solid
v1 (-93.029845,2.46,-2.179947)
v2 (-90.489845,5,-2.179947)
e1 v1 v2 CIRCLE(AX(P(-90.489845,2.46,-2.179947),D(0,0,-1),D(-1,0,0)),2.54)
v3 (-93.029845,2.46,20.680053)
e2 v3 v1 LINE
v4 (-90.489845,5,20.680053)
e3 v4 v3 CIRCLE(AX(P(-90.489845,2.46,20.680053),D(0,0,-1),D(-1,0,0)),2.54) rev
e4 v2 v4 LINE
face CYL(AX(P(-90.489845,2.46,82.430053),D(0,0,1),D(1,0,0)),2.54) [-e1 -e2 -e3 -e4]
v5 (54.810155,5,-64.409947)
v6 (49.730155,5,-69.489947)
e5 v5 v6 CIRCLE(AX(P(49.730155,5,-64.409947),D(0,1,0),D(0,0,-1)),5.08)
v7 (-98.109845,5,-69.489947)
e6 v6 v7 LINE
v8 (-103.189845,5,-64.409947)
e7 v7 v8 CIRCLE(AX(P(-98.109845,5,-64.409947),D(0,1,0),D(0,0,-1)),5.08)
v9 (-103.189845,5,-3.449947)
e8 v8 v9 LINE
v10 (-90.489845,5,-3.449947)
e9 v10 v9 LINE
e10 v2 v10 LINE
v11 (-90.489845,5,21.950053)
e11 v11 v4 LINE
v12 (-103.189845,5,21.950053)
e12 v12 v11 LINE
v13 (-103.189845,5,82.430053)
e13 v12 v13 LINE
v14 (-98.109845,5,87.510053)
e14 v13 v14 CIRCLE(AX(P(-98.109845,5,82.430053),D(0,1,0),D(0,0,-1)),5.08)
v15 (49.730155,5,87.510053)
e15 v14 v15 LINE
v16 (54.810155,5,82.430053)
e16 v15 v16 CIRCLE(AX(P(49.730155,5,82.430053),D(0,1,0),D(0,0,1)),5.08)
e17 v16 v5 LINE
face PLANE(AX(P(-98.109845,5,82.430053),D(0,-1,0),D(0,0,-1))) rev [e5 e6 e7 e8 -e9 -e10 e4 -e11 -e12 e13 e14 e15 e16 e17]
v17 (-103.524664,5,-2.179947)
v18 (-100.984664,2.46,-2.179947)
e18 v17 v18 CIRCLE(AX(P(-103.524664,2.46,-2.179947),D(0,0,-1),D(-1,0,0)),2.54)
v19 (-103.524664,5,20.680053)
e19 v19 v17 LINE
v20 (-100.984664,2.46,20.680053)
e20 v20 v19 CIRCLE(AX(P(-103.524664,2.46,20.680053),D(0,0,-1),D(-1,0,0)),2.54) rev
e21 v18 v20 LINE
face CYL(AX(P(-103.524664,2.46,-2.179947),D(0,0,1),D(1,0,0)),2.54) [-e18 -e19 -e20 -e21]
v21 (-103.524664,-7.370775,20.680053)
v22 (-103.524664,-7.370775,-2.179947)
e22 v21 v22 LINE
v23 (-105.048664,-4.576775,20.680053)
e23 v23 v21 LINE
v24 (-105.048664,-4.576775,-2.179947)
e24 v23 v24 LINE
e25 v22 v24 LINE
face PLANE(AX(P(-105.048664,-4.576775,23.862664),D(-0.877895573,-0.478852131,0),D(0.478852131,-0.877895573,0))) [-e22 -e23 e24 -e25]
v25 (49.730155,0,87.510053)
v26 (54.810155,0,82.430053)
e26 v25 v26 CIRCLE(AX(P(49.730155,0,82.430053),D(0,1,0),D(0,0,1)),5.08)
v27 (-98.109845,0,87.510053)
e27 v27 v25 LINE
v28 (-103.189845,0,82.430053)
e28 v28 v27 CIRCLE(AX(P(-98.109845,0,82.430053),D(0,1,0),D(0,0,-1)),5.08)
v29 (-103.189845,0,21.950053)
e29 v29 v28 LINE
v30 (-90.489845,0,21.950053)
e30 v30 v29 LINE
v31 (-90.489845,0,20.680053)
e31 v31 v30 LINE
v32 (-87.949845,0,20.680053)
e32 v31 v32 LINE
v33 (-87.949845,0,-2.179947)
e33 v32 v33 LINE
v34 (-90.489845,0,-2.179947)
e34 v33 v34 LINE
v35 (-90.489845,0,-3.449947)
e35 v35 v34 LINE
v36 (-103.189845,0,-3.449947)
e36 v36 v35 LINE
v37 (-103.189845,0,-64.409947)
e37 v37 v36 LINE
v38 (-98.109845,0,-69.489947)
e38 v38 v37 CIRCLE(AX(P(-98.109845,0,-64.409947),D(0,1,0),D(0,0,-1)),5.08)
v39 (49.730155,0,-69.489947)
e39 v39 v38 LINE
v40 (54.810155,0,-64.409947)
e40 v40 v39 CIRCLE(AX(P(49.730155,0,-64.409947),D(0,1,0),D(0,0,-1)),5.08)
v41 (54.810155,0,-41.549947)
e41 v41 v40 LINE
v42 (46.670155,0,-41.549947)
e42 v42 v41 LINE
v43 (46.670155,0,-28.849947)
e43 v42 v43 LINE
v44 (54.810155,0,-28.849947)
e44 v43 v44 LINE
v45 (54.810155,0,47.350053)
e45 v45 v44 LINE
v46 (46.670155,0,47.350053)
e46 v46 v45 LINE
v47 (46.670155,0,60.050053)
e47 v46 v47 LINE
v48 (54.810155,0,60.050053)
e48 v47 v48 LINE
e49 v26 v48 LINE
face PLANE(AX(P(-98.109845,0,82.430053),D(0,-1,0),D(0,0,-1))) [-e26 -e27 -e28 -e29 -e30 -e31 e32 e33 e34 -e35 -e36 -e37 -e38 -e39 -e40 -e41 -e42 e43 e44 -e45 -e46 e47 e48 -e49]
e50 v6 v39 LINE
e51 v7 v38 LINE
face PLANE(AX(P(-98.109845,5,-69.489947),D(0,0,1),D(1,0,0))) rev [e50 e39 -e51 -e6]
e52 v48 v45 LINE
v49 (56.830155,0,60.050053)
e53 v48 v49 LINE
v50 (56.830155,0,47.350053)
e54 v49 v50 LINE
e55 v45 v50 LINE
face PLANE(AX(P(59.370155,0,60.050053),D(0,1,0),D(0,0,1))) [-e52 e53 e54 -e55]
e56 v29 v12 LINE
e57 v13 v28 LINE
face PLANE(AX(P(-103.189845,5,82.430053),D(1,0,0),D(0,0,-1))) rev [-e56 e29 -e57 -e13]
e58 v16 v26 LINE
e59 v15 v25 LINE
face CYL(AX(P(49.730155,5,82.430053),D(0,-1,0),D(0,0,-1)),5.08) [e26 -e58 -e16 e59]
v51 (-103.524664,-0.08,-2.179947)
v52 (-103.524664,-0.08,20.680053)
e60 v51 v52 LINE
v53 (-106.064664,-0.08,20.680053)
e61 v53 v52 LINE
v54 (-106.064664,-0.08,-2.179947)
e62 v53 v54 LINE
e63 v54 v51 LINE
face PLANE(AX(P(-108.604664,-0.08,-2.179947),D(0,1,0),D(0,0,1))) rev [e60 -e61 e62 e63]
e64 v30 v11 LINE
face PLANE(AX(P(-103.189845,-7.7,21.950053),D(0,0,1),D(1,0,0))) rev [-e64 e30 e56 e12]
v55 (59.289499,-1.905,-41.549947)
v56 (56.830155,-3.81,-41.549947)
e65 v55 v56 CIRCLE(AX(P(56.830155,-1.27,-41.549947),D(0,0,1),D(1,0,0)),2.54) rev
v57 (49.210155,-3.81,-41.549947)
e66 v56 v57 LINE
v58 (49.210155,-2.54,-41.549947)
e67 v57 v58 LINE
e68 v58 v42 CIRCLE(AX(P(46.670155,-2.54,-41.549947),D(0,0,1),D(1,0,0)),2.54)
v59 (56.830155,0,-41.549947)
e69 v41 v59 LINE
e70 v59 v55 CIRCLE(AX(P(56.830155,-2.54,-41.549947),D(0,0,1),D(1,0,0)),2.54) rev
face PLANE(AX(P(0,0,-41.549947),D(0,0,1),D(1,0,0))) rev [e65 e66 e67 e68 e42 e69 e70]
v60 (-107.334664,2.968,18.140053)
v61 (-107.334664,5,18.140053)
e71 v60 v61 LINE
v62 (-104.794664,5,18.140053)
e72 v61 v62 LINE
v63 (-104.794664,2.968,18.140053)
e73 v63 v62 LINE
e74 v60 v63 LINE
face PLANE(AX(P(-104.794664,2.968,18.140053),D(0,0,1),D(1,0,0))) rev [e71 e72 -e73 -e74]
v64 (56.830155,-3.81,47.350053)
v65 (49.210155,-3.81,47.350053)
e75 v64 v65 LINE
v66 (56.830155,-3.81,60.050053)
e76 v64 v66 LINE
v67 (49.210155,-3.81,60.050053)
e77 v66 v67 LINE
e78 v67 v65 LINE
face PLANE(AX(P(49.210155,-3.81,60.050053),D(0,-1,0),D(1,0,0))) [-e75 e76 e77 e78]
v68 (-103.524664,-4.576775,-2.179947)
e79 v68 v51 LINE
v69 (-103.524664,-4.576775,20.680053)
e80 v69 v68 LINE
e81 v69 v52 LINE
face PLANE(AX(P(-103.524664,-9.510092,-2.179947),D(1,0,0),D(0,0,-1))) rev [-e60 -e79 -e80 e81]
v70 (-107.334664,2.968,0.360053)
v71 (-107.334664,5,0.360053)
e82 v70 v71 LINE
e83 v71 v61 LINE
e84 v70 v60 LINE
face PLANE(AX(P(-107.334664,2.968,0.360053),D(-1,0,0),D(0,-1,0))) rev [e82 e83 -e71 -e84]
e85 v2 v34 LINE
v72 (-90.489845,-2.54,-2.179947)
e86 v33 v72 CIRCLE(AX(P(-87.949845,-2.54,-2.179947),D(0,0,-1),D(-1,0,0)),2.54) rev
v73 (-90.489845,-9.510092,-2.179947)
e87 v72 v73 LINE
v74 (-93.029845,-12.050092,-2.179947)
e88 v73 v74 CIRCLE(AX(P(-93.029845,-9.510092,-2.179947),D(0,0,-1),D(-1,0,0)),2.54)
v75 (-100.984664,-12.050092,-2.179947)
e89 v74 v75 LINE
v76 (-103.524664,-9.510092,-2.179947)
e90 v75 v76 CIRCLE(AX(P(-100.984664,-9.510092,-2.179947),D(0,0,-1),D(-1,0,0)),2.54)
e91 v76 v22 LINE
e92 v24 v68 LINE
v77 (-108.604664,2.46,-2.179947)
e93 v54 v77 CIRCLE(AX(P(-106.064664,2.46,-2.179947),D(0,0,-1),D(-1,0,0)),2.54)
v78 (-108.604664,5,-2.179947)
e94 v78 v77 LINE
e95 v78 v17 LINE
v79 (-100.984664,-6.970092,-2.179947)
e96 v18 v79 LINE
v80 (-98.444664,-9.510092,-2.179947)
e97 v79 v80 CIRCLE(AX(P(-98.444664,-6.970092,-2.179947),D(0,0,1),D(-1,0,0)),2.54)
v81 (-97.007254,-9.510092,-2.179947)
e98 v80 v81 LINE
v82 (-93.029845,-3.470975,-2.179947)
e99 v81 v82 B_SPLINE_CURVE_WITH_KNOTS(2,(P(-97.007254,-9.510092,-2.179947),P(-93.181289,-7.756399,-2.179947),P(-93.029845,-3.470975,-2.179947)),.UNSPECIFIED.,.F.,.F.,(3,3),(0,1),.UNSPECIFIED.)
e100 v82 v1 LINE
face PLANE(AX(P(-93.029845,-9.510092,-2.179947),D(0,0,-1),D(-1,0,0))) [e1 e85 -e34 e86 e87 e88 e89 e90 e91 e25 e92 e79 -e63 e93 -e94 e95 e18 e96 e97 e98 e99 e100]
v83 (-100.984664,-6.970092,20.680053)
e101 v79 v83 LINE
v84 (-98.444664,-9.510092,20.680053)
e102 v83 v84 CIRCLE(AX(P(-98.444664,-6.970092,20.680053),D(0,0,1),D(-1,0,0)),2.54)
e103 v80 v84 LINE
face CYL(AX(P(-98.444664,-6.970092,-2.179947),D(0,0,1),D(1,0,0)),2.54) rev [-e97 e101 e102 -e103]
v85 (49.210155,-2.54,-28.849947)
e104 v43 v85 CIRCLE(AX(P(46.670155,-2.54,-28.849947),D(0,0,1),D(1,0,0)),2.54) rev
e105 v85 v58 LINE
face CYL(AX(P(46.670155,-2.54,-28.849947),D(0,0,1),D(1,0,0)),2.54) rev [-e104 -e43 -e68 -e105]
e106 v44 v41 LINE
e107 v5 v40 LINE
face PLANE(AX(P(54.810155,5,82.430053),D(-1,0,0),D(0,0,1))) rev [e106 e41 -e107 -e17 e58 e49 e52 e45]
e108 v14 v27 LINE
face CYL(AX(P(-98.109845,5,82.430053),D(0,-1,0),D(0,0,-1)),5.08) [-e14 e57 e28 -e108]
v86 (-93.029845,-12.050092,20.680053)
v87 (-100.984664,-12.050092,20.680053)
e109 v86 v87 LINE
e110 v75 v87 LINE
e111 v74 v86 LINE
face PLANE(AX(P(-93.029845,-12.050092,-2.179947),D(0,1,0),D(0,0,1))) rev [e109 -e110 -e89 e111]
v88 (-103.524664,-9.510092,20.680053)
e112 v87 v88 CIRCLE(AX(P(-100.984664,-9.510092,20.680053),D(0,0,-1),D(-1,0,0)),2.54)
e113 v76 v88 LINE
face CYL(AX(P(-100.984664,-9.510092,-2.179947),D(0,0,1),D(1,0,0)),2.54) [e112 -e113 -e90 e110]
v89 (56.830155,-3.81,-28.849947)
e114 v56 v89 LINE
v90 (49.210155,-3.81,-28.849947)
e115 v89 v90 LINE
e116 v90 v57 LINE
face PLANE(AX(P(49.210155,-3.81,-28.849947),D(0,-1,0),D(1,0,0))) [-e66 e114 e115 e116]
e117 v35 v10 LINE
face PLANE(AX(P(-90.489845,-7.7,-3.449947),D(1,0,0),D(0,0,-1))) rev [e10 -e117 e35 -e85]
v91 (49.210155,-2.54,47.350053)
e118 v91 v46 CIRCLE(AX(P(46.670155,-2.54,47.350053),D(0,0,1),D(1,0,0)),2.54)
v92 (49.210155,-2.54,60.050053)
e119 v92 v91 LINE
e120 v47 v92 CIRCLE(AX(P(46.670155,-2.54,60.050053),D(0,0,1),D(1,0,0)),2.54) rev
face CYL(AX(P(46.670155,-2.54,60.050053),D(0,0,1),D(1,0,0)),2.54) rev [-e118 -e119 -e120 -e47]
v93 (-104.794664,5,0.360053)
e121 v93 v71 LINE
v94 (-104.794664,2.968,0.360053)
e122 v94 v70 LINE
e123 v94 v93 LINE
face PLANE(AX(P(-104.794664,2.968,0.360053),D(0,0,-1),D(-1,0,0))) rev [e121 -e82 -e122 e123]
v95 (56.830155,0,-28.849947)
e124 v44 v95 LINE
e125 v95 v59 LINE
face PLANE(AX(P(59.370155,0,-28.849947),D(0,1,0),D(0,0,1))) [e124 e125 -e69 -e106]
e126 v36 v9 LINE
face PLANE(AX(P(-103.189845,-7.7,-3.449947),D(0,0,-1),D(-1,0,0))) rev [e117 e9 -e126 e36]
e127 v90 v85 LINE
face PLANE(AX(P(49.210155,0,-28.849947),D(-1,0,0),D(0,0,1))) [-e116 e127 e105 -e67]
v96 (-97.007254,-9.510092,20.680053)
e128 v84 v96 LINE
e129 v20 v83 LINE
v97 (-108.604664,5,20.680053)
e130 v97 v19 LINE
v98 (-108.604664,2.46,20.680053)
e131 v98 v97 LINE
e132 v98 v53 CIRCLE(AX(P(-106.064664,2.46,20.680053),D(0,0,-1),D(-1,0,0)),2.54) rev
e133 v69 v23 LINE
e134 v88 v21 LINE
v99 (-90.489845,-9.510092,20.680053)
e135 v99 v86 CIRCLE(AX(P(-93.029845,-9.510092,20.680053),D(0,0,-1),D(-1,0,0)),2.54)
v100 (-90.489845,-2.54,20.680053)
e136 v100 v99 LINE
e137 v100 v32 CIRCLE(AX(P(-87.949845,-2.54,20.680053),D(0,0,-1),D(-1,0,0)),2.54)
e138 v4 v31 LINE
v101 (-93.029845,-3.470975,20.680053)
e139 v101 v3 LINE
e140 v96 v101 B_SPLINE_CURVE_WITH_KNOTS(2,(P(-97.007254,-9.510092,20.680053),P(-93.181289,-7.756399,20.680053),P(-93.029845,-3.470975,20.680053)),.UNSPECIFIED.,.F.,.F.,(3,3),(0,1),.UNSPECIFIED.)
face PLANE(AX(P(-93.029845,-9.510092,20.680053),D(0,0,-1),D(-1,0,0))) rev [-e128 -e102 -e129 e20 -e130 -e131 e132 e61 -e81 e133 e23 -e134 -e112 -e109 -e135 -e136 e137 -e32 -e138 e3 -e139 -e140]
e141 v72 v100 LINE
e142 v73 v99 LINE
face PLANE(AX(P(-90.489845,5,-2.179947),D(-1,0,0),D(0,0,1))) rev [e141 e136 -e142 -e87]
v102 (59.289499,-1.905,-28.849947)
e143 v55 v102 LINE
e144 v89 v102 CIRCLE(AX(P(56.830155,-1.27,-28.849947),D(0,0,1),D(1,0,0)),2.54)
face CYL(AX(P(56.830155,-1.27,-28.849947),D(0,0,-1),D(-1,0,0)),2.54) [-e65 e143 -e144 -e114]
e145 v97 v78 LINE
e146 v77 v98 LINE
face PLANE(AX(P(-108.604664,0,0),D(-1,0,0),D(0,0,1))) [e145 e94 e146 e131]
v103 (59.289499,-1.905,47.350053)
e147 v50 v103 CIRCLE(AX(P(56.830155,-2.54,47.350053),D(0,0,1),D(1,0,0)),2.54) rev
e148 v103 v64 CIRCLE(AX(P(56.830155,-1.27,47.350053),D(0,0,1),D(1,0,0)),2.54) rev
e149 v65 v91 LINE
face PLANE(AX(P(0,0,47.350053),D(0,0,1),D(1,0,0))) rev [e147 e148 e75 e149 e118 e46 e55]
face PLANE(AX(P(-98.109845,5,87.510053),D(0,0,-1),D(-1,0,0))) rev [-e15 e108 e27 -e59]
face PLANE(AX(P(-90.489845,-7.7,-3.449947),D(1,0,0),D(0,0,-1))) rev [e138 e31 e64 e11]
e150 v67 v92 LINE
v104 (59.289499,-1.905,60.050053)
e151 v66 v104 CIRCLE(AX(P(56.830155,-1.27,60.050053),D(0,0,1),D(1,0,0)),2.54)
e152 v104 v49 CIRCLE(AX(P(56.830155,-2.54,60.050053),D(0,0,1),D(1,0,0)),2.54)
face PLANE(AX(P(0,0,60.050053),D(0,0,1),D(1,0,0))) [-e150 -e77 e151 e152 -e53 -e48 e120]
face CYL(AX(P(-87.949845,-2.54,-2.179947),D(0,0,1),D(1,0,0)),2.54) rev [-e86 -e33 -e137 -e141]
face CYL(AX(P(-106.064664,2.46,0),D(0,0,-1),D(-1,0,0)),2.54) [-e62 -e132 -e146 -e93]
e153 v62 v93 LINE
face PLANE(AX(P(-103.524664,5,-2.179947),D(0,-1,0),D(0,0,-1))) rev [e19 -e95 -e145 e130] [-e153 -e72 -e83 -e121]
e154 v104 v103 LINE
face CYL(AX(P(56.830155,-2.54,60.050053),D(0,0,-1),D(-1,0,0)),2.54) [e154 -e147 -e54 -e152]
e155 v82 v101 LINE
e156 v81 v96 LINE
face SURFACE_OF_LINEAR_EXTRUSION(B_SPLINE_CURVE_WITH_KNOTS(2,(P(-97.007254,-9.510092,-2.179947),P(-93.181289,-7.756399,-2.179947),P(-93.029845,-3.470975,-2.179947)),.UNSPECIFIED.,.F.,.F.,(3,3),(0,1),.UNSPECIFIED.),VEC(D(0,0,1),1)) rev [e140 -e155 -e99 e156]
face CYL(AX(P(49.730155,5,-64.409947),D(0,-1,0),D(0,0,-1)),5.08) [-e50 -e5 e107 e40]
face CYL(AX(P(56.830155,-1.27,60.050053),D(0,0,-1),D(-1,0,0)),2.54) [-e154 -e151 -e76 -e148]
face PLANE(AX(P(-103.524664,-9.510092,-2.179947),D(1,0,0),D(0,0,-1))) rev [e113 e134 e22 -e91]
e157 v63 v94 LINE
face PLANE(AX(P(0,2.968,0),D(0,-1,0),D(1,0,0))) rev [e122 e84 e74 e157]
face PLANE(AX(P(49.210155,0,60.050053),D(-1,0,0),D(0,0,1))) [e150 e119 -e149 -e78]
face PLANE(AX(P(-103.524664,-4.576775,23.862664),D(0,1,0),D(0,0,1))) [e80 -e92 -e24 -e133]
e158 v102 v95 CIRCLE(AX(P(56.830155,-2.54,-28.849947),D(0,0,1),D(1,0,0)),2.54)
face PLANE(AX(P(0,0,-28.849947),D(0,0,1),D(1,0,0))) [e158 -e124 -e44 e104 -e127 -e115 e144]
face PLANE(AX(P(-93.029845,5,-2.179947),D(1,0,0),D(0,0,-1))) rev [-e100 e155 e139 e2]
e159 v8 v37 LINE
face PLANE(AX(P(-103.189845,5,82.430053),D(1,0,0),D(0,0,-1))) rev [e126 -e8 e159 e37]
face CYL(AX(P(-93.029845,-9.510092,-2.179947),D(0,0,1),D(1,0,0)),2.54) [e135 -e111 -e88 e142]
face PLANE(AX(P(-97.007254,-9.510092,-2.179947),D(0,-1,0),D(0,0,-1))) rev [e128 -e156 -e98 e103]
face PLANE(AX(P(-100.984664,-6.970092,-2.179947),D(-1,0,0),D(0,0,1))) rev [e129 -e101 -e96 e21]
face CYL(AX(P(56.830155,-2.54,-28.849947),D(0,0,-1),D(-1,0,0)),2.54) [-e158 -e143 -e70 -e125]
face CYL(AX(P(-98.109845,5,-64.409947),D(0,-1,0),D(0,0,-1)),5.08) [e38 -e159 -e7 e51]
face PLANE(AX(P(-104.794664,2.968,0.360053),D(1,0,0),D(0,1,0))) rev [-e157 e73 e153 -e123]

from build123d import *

# Parameters (mm, degrees)
BOSS_EXTRUDE1_DEPTH  = 5
SKETCH8_W            = 12.7
SKETCH8_H            = 25.4
CUT_EXTRUDE1_DEPTH   = 12.7
BOSS_EXTRUDE6_START  = 1.27
BOSS_EXTRUDE6_DEPTH  = 22.86
FILLET3_R            = 2.54
SKETCH12_W           = 22.86
SKETCH12_H           = 5.08
BOSS_EXTRUDE7_DEPTH  = 5.08
FILLET8_R            = 2.54
SKETCH13_W           = 2.54
SKETCH13_H           = 17.78
CUT_EXTRUDE2_DEPTH   = 2.032
BOSS_EXTRUDE8_DEPTH  = 22.86
FILLET5_R            = 2.54
FILLET6_R            = 2.54
BOSS_EXTRUDE9_START  = -27.94
SKETCH15_W           = 10.16
SKETCH15_H           = 3.81
BOSS_EXTRUDE9_DEPTH  = 12.7
BOSS_EXTRUDE10_START = -116.84
SKETCH15_2_W         = 10.16
SKETCH15_2_H         = 3.81
BOSS_EXTRUDE10_DEPTH = 12.7
FILLET7_R            = 2.54


with BuildPart() as part:
    # Sketch2 → Boss-Extrude1 (new body)
    with BuildSketch(Plane(origin=(0, 0, 0), x_dir=(1, 0, 0), z_dir=(0, 1, 0))):
        with BuildLine():
            Line((-98.109845206, -87.510053172), (49.730154794, -87.510053172))
            ThreePointArc((49.730154794, -87.510053172), (53.322257243, -86.02215562), (54.810154794, -82.430053172))
            Line((54.810154794, -82.430053172), (54.810154794, 64.409946828))
            ThreePointArc((54.810154794, 64.409946828), (53.322257243, 68.002049277), (49.730154794, 69.489946828))
            Line((49.730154794, 69.489946828), (-98.109845206, 69.489946828))
            ThreePointArc((-98.109845206, 69.489946828), (-101.701947654, 68.002049277), (-103.189845206, 64.409946828))
            Line((-103.189845206, 64.409946828), (-103.189845206, -82.430053172))
            ThreePointArc((-103.189845206, -82.430053172), (-101.701947654, -86.02215562), (-98.109845206, -87.510053172))
        make_face()
    extrude(amount=BOSS_EXTRUDE1_DEPTH)

    # Sketch8 → Cut-Extrude1 (cut)
    with BuildSketch(Plane(origin=(0, 5, 0), x_dir=(1, 0, 0), z_dir=(0, 1, 0))):
        with Locations((-96.839845206, -9.250053172)):
            Rectangle(SKETCH8_W, SKETCH8_H)
    extrude(amount=-CUT_EXTRUDE1_DEPTH, mode=Mode.SUBTRACT)

    # Sketch9 → Boss-Extrude6 (add)
    with BuildSketch(Plane(origin=(0, 0, 21.950053172), x_dir=(-1, 0, 0), z_dir=(0, 0, -1)).offset(BOSS_EXTRUDE6_START)):
        with BuildLine():
            Line((90.489845206, 5), (90.489845206, -9.510091846))
            ThreePointArc((90.489845206, -9.510091846), (91.233793982, -11.30614307), (93.029845206, -12.050091846))
            Line((93.029845206, -12.050091846), (100.984663509, -12.050091846))
            ThreePointArc((100.984663509, -12.050091846), (102.780714734, -11.30614307), (103.524663509, -9.510091846))
            Line((103.524663509, -9.510091846), (103.524663509, 5))
            Line((103.524663509, 5), (100.984663509, 5))
            Line((100.984663509, 5), (100.984663509, -6.970091846))
            ThreePointArc((100.984663509, -6.970091846), (100.240714734, -8.76614307), (98.444663509, -9.510091846))
            Line((98.444663509, -9.510091846), (97.007254358, -9.510091846))
            add(Edge.make_bspline(
                [(93.029845206, -3.470974905), (93.181288834, -7.756398779), (97.007254358, -9.510091846)],
                knots=[0, 0, 0, 1, 1, 1], degree=2))
            Line((93.029845206, -3.470974905), (93.029845206, 5))
            Line((93.029845206, 5), (90.489845206, 5))
        make_face()
    extrude(amount=BOSS_EXTRUDE6_DEPTH)

    # Fillet3
    fillet3_edges = [part.edges().sort_by_distance(p)[0] for p in [
        (-90.489845206, 0, 9.250053172),
    ]]
    fillet(fillet3_edges, radius=FILLET3_R)

    # Sketch12 → Boss-Extrude7 (add)
    with BuildSketch(Plane.ZY.offset(103.524663509)):
        with Locations((9.250053172, 2.46)):
            Rectangle(SKETCH12_W, SKETCH12_H)
    extrude(amount=BOSS_EXTRUDE7_DEPTH)

    # Fillet8
    fillet8_edges = [part.edges().sort_by_distance(p)[0] for p in [
        (-100.984663509, 5, 9.250053172),
    ]]
    fillet(fillet8_edges, radius=FILLET8_R)

    # Sketch13 → Cut-Extrude2 (cut)
    with BuildSketch(Plane(origin=(0, 5, 0), x_dir=(1, 0, 0), z_dir=(0, 1, 0))):
        with Locations((-106.064663509, -9.250053172)):
            Rectangle(SKETCH13_W, SKETCH13_H)
    extrude(amount=-CUT_EXTRUDE2_DEPTH, mode=Mode.SUBTRACT)

    # Sketch14 → Boss-Extrude8 (add)
    with BuildSketch(Plane(origin=(0, 0, -2.179946828), x_dir=(-1, 0, 0), z_dir=(0, 0, -1))):
        Polygon((103.524663509, -4.576775108), (105.048663509, -4.576775108), (103.524663509, -7.370775108), align=None)
    extrude(amount=-BOSS_EXTRUDE8_DEPTH)

    # Fillet5
    fillet5_edges = [part.edges().sort_by_distance(p)[0] for p in [
        (-93.029845206, 5, 9.250053172),
    ]]
    fillet(fillet5_edges, radius=FILLET5_R)

    # Fillet6
    fillet6_edges = [part.edges().sort_by_distance(p)[0] for p in [
        (-108.604663509, -0.08, 9.250053172),
    ]]
    fillet(fillet6_edges, radius=FILLET6_R)

    # Sketch15 → Boss-Extrude9 (add)
    with BuildSketch(Plane(origin=(0, 0, -69.489946828), x_dir=(-1, 0, 0), z_dir=(0, 0, -1)).offset(BOSS_EXTRUDE9_START)):
        with Locations((-54.290154794, -1.905)):
            Rectangle(SKETCH15_W, SKETCH15_H)
    extrude(amount=-BOSS_EXTRUDE9_DEPTH)

    # Sketch15<2> → Boss-Extrude10 (add)
    with BuildSketch(Plane(origin=(0, 0, -69.489946828), x_dir=(-1, 0, 0), z_dir=(0, 0, -1)).offset(BOSS_EXTRUDE10_START)):
        with Locations((-54.290154794, -1.905)):
            Rectangle(SKETCH15_2_W, SKETCH15_2_H)
    extrude(amount=-BOSS_EXTRUDE10_DEPTH)

    # Fillet7
    # the kernel refuses this fillet: 2.54 mm, written as the material it adds along each edge
    with BuildSketch(Plane(origin=(49.210154794, 0, 47.350053172), x_dir=(-1, 0, 0), z_dir=(0, 0, 1)), Plane(origin=(49.210154794, 0, -41.549946828), x_dir=(-1, 0, 0), z_dir=(0, 0, 1))) as fillet7_piece_1:
        with BuildLine():
            CenterArc((FILLET7_R, FILLET7_R), FILLET7_R, 180, 90)
            Line((0, FILLET7_R), (0, 0))
            Line((0, 0), (FILLET7_R, 0))
        make_face()
    extrude(amount=12.7)
    # the kernel refuses this fillet: 2.54 mm, written as the material it takes off along each edge
    with BuildSketch(Plane(origin=(59.370154794, 0, 41.000053172), x_dir=(-1, 0, 0), z_dir=(0, 0, 1)), Plane(origin=(59.370154794, -3.81, 41.000053172), x_dir=(0, 1, 0), z_dir=(0, 0, 1)), Plane(origin=(59.370154794, -3.81, -47.899946828), x_dir=(0, 1, 0), z_dir=(0, 0, 1)), Plane(origin=(59.370154794, 0, -47.899946828), x_dir=(-1, 0, 0), z_dir=(0, 0, 1))) as fillet7_2_piece_1:
        with BuildLine():
            CenterArc((FILLET7_R, FILLET7_R), FILLET7_R, 180, 90)
            Line((0, FILLET7_R), (0, 0))
            Line((0, 0), (FILLET7_R, 0))
        make_face()
    extrude(amount=25.4, mode=Mode.SUBTRACT)


solid = part.part
